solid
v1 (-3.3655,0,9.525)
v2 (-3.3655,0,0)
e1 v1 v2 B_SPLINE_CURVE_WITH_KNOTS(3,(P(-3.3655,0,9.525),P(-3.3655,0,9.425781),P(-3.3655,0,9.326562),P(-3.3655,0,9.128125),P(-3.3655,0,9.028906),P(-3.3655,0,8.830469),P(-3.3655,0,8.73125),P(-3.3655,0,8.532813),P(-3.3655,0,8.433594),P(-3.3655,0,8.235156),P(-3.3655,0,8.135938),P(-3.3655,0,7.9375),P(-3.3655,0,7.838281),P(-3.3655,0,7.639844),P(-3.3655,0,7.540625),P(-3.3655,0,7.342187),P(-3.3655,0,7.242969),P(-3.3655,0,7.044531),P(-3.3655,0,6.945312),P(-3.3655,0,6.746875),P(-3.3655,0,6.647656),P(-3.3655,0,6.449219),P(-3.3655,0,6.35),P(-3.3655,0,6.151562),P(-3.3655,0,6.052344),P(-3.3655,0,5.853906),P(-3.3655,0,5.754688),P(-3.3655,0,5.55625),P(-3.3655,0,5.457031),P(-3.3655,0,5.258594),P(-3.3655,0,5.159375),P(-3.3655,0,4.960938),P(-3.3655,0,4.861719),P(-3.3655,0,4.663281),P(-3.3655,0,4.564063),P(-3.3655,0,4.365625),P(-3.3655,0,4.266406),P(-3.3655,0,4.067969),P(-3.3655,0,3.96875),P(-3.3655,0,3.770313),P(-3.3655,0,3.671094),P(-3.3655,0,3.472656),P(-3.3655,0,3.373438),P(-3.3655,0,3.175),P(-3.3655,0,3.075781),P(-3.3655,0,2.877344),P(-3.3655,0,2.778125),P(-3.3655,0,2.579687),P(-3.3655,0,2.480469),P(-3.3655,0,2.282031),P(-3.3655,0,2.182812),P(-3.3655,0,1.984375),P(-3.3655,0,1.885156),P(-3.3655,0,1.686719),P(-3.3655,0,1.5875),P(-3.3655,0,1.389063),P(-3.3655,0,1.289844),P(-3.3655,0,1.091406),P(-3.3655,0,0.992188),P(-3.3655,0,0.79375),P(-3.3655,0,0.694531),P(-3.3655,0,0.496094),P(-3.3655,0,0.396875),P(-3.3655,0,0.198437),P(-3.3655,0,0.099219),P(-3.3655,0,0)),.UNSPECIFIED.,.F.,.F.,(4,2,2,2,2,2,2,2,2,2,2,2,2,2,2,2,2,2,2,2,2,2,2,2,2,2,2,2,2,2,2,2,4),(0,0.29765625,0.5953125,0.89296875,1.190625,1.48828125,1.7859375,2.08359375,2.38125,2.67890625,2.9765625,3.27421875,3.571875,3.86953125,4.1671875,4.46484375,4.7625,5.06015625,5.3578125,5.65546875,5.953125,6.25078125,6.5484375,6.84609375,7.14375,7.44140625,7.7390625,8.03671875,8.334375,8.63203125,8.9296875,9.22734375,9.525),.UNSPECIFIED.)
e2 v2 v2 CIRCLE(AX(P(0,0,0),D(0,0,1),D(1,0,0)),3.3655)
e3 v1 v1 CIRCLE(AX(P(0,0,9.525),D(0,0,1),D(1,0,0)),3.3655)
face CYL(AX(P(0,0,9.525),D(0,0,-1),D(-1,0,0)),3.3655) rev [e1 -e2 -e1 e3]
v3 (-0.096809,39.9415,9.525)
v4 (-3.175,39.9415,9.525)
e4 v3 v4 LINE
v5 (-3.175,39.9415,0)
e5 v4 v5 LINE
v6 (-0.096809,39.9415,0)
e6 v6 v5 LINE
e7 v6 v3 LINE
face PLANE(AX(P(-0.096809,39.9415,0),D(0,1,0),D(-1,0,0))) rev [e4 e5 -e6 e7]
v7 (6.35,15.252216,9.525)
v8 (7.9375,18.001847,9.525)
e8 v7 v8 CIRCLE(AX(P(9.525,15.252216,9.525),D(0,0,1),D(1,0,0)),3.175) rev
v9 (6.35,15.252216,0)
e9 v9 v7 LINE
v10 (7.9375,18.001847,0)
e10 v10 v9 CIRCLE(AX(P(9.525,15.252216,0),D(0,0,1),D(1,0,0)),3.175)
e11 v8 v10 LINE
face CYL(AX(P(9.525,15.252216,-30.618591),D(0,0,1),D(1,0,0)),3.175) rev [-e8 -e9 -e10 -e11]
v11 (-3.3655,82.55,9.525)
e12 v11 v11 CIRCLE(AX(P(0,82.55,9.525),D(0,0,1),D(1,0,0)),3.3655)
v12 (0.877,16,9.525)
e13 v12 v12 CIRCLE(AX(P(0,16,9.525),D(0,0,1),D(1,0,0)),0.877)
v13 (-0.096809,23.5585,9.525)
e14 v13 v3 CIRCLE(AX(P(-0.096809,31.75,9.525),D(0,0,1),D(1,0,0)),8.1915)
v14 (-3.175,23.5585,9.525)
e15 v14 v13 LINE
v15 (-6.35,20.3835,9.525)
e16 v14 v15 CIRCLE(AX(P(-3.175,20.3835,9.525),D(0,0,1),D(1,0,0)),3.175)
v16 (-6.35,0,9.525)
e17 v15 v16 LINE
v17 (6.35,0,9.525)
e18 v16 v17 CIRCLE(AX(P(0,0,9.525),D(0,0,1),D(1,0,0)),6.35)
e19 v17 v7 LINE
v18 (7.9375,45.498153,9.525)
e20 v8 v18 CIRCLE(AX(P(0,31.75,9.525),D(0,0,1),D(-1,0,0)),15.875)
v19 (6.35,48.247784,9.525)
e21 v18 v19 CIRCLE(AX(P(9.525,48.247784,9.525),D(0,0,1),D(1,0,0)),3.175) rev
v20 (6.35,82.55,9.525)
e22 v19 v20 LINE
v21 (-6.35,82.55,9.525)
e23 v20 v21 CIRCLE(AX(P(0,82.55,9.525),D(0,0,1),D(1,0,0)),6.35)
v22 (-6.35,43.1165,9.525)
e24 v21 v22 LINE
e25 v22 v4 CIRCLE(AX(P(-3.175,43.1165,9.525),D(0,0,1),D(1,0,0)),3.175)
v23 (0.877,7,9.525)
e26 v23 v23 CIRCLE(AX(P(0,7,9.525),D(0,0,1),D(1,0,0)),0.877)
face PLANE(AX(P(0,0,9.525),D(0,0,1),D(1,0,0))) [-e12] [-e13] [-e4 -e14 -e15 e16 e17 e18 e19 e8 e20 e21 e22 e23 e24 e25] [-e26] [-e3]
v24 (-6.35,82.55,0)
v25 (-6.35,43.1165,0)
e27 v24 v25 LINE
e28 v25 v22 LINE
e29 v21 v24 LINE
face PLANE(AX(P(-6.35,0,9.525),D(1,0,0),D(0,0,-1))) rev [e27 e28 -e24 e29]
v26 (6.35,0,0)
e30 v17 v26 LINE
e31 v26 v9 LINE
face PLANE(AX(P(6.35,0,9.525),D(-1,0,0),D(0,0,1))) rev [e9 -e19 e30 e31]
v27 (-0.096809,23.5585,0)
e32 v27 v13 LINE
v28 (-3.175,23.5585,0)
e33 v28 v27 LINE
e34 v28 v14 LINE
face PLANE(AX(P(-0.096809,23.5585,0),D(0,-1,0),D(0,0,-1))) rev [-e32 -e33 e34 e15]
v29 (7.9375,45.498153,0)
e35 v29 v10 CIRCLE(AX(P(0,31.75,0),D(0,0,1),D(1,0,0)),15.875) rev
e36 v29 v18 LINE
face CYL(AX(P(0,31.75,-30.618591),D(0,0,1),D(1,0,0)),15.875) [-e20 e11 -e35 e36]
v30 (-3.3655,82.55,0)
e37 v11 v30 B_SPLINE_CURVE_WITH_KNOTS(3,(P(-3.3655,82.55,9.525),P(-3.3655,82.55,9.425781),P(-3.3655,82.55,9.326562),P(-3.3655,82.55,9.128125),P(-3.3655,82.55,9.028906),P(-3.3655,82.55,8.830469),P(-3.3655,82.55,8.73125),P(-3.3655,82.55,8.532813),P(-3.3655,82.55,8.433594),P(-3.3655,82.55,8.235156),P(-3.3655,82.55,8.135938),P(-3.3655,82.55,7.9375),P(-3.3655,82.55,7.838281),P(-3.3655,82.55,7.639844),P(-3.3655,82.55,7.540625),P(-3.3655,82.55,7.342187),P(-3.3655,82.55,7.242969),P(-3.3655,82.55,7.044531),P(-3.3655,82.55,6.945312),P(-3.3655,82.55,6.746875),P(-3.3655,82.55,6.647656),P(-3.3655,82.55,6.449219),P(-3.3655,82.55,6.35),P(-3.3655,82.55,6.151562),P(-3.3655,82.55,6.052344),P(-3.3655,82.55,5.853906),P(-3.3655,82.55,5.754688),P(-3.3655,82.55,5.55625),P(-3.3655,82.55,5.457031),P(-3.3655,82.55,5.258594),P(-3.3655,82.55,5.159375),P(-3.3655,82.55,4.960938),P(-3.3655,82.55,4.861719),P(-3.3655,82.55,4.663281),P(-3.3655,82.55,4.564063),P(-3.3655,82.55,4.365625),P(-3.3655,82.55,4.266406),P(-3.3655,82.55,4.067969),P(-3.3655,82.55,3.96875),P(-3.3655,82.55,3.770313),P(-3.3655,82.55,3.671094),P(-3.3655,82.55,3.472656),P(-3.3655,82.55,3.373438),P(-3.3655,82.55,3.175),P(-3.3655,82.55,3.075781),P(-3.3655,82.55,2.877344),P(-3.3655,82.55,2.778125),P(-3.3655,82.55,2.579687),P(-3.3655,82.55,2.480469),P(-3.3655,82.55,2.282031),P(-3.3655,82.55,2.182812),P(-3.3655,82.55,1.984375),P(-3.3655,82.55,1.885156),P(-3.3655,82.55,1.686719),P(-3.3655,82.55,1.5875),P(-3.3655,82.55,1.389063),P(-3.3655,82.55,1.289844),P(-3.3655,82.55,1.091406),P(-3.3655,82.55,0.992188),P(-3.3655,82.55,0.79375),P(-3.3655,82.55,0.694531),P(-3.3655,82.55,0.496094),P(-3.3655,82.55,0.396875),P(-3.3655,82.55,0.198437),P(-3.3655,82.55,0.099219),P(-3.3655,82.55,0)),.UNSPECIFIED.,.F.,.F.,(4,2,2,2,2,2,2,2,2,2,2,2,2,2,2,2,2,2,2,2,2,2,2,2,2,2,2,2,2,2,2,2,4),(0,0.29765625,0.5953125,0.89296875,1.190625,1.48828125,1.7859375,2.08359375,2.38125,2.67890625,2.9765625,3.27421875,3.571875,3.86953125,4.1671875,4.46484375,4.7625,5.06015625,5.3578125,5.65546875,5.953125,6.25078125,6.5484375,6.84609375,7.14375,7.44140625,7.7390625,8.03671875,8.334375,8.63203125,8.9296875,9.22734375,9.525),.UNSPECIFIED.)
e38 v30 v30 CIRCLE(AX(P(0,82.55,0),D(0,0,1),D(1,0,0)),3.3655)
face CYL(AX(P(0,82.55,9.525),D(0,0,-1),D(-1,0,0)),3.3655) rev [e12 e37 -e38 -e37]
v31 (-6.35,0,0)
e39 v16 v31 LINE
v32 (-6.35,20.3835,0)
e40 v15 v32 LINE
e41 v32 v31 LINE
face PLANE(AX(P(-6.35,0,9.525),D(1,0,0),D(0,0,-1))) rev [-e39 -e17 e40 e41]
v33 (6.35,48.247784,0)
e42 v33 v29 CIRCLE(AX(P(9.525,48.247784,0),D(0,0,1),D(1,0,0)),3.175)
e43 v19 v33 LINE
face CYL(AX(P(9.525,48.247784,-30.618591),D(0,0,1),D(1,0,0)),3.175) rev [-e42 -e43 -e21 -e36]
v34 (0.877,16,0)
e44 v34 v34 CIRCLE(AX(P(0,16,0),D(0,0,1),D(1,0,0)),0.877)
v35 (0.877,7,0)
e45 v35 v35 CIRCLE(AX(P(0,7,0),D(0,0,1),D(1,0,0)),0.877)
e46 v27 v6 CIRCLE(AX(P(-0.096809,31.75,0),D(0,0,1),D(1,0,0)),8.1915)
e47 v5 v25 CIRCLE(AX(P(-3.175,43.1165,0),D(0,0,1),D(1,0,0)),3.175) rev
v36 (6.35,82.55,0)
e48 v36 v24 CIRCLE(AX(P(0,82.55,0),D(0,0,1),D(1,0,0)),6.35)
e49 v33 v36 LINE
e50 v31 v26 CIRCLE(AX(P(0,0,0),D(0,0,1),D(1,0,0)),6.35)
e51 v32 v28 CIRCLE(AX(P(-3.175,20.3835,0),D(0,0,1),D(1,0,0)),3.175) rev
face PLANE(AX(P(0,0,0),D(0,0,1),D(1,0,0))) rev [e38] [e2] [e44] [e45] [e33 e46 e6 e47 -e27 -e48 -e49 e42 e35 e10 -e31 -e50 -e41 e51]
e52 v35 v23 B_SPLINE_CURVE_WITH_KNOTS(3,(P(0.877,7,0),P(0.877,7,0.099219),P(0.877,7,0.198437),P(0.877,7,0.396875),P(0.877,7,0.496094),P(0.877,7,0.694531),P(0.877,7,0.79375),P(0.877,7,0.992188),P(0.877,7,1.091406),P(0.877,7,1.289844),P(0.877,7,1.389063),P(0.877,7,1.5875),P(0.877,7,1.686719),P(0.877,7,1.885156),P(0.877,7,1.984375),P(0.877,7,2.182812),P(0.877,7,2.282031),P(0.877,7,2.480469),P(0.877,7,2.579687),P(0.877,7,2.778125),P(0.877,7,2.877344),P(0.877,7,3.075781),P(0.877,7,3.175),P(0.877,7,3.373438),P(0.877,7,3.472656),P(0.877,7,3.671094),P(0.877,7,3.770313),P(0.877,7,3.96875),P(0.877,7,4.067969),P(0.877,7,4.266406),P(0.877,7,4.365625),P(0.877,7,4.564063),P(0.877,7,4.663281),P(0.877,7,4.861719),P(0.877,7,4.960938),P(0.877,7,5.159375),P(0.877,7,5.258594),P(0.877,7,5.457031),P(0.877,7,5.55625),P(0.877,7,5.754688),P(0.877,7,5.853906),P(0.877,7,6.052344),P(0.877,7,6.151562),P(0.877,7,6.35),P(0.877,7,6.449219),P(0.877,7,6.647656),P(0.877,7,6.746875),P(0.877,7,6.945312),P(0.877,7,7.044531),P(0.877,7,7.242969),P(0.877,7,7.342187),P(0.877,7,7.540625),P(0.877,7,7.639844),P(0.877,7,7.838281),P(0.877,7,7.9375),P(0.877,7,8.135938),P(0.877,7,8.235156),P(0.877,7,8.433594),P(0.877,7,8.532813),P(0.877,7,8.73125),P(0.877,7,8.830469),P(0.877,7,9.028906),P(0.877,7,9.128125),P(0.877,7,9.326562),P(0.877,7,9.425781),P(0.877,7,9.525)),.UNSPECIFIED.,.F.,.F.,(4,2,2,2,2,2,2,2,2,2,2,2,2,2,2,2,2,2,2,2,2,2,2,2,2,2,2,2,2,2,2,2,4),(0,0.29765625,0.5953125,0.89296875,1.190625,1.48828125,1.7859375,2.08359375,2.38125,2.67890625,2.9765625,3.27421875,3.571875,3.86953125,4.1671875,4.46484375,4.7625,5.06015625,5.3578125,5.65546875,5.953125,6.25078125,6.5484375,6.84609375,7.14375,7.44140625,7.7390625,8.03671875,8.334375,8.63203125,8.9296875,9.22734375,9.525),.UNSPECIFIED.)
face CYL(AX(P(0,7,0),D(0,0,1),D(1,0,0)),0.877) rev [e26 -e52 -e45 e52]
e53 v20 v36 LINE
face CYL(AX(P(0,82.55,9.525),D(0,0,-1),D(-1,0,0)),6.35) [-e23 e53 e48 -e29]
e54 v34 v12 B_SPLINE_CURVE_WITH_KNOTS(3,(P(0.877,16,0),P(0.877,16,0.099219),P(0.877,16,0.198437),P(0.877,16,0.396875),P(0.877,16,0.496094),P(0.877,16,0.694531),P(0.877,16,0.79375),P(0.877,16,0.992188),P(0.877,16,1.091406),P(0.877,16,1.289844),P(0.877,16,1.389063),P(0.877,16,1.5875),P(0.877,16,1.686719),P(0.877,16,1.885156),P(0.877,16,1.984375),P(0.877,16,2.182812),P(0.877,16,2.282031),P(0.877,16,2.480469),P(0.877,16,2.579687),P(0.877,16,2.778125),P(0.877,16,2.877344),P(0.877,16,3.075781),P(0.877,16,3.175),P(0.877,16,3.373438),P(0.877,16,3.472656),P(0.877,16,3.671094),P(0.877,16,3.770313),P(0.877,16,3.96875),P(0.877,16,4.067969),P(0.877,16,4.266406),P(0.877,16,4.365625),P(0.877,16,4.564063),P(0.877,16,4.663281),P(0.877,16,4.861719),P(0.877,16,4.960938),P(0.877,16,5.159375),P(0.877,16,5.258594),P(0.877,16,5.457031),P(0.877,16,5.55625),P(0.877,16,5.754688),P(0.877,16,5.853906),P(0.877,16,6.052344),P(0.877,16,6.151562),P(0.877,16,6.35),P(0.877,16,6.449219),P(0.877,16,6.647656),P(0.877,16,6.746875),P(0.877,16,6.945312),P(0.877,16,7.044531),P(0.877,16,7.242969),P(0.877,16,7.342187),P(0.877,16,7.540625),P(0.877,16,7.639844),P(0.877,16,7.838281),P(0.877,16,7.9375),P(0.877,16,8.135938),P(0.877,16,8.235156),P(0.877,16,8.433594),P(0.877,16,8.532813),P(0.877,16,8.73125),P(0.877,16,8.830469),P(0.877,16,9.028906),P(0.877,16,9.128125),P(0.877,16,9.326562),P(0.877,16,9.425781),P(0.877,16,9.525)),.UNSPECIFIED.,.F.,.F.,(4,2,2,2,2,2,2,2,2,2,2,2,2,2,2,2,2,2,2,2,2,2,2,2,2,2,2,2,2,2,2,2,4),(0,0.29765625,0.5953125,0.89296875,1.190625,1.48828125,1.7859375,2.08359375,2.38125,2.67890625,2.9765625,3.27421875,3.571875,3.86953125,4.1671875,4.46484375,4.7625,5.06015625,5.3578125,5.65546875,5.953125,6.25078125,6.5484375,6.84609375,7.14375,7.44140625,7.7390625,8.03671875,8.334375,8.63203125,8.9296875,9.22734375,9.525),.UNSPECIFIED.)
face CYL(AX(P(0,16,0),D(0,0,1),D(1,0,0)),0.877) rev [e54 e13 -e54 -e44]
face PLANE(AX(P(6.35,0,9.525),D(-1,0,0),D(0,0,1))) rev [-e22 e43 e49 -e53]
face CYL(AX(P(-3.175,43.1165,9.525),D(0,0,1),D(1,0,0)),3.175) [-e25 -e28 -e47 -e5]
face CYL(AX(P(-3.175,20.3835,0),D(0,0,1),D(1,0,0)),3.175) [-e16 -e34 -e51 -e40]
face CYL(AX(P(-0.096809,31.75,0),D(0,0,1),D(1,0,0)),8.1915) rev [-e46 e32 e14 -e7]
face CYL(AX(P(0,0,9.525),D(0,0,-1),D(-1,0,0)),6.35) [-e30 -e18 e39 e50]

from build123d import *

# Parameters (mm, degrees)
F_4_BAR_LINKAGE_NON_DRIVEN_BAR_OUTLINE_R   = 3.3655
F_4_BAR_LINKAGE_NON_DRIVEN_BAR_OUTLINE_R_2 = 0.877000024
F_4_BAR_LINKAGE_NON_DRIVEN_BAR_DEPTH       = 9.525
BOSS_EXTRUDE2_DEPTH                        = 9.525
CUT_EXTRUDE1_DEPTH                         = 91.807220253
FILLET1_R                                  = 3.175
FILLET3_R                                  = 3.175


# Read off the part's stored shape, not the designer's step: 4 bar linkage non-driven bar
with BuildPart() as part:
    # 4 bar linkage non-driven bar outline → 4 bar linkage non-driven bar (new body)
    with BuildSketch(Plane.XY):
        with BuildLine():
            ThreePointArc((-6.35, 0), (0, -6.35), (6.35, 0))
            Line((6.35, 0), (6.35, 82.55))
            ThreePointArc((6.35, 82.55), (0, 88.9), (-6.35, 82.55))
            Line((-6.35, 82.55), (-6.35, 0))
        make_face()
        Circle(F_4_BAR_LINKAGE_NON_DRIVEN_BAR_OUTLINE_R, mode=Mode.SUBTRACT)
        with Locations((0, 6.99999997)):
            Circle(F_4_BAR_LINKAGE_NON_DRIVEN_BAR_OUTLINE_R_2, mode=Mode.SUBTRACT)
        with Locations((0, 16.000000004)):
            Circle(F_4_BAR_LINKAGE_NON_DRIVEN_BAR_OUTLINE_R_2, mode=Mode.SUBTRACT)
        with Locations((0, 82.55)):
            Circle(F_4_BAR_LINKAGE_NON_DRIVEN_BAR_OUTLINE_R, mode=Mode.SUBTRACT)
    extrude(amount=F_4_BAR_LINKAGE_NON_DRIVEN_BAR_DEPTH)

    # Sketch2 → Boss-Extrude2 (add)
    with BuildSketch(Plane.XY.offset(9.525)):
        with BuildLine():
            Line((6.35, 17.200322169), (6.35, 46.299677831))
            ThreePointArc((6.35, 46.299677831), (15.875, 31.75), (6.35, 17.200322169))
        make_face()
    extrude(amount=-BOSS_EXTRUDE2_DEPTH)

    # Sketch1 → Cut-Extrude1 (cut, through all)
    with BuildSketch(Plane.XY.offset(9.525)):
        with BuildLine():
            Line((-0.096808673, 39.9415), (-6.35, 39.9415))
            Line((-6.35, 39.9415), (-6.35, 23.5585))
            Line((-6.35, 23.5585), (-0.096808673, 23.5585))
            ThreePointArc((-0.096808673, 23.5585), (8.094691327, 31.75), (-0.096808673, 39.9415))
        make_face()
    extrude(amount=-CUT_EXTRUDE1_DEPTH, mode=Mode.SUBTRACT)

    # Fillet1
    fillet1_edges = [part.edges().sort_by_distance(p)[0] for p in [
        (-6.35, 23.5585, 4.7625),
        (-6.35, 39.9415, 4.7625),
    ]]
    fillet(fillet1_edges, radius=FILLET1_R)

    # Fillet3
    fillet3_edges = [part.edges().sort_by_distance(p)[0] for p in [
        (6.35, 46.299677831, 4.7625),
        (6.35, 17.200322169, 4.7625),
    ]]
    fillet(fillet3_edges, radius=FILLET3_R)


solid = part.part
